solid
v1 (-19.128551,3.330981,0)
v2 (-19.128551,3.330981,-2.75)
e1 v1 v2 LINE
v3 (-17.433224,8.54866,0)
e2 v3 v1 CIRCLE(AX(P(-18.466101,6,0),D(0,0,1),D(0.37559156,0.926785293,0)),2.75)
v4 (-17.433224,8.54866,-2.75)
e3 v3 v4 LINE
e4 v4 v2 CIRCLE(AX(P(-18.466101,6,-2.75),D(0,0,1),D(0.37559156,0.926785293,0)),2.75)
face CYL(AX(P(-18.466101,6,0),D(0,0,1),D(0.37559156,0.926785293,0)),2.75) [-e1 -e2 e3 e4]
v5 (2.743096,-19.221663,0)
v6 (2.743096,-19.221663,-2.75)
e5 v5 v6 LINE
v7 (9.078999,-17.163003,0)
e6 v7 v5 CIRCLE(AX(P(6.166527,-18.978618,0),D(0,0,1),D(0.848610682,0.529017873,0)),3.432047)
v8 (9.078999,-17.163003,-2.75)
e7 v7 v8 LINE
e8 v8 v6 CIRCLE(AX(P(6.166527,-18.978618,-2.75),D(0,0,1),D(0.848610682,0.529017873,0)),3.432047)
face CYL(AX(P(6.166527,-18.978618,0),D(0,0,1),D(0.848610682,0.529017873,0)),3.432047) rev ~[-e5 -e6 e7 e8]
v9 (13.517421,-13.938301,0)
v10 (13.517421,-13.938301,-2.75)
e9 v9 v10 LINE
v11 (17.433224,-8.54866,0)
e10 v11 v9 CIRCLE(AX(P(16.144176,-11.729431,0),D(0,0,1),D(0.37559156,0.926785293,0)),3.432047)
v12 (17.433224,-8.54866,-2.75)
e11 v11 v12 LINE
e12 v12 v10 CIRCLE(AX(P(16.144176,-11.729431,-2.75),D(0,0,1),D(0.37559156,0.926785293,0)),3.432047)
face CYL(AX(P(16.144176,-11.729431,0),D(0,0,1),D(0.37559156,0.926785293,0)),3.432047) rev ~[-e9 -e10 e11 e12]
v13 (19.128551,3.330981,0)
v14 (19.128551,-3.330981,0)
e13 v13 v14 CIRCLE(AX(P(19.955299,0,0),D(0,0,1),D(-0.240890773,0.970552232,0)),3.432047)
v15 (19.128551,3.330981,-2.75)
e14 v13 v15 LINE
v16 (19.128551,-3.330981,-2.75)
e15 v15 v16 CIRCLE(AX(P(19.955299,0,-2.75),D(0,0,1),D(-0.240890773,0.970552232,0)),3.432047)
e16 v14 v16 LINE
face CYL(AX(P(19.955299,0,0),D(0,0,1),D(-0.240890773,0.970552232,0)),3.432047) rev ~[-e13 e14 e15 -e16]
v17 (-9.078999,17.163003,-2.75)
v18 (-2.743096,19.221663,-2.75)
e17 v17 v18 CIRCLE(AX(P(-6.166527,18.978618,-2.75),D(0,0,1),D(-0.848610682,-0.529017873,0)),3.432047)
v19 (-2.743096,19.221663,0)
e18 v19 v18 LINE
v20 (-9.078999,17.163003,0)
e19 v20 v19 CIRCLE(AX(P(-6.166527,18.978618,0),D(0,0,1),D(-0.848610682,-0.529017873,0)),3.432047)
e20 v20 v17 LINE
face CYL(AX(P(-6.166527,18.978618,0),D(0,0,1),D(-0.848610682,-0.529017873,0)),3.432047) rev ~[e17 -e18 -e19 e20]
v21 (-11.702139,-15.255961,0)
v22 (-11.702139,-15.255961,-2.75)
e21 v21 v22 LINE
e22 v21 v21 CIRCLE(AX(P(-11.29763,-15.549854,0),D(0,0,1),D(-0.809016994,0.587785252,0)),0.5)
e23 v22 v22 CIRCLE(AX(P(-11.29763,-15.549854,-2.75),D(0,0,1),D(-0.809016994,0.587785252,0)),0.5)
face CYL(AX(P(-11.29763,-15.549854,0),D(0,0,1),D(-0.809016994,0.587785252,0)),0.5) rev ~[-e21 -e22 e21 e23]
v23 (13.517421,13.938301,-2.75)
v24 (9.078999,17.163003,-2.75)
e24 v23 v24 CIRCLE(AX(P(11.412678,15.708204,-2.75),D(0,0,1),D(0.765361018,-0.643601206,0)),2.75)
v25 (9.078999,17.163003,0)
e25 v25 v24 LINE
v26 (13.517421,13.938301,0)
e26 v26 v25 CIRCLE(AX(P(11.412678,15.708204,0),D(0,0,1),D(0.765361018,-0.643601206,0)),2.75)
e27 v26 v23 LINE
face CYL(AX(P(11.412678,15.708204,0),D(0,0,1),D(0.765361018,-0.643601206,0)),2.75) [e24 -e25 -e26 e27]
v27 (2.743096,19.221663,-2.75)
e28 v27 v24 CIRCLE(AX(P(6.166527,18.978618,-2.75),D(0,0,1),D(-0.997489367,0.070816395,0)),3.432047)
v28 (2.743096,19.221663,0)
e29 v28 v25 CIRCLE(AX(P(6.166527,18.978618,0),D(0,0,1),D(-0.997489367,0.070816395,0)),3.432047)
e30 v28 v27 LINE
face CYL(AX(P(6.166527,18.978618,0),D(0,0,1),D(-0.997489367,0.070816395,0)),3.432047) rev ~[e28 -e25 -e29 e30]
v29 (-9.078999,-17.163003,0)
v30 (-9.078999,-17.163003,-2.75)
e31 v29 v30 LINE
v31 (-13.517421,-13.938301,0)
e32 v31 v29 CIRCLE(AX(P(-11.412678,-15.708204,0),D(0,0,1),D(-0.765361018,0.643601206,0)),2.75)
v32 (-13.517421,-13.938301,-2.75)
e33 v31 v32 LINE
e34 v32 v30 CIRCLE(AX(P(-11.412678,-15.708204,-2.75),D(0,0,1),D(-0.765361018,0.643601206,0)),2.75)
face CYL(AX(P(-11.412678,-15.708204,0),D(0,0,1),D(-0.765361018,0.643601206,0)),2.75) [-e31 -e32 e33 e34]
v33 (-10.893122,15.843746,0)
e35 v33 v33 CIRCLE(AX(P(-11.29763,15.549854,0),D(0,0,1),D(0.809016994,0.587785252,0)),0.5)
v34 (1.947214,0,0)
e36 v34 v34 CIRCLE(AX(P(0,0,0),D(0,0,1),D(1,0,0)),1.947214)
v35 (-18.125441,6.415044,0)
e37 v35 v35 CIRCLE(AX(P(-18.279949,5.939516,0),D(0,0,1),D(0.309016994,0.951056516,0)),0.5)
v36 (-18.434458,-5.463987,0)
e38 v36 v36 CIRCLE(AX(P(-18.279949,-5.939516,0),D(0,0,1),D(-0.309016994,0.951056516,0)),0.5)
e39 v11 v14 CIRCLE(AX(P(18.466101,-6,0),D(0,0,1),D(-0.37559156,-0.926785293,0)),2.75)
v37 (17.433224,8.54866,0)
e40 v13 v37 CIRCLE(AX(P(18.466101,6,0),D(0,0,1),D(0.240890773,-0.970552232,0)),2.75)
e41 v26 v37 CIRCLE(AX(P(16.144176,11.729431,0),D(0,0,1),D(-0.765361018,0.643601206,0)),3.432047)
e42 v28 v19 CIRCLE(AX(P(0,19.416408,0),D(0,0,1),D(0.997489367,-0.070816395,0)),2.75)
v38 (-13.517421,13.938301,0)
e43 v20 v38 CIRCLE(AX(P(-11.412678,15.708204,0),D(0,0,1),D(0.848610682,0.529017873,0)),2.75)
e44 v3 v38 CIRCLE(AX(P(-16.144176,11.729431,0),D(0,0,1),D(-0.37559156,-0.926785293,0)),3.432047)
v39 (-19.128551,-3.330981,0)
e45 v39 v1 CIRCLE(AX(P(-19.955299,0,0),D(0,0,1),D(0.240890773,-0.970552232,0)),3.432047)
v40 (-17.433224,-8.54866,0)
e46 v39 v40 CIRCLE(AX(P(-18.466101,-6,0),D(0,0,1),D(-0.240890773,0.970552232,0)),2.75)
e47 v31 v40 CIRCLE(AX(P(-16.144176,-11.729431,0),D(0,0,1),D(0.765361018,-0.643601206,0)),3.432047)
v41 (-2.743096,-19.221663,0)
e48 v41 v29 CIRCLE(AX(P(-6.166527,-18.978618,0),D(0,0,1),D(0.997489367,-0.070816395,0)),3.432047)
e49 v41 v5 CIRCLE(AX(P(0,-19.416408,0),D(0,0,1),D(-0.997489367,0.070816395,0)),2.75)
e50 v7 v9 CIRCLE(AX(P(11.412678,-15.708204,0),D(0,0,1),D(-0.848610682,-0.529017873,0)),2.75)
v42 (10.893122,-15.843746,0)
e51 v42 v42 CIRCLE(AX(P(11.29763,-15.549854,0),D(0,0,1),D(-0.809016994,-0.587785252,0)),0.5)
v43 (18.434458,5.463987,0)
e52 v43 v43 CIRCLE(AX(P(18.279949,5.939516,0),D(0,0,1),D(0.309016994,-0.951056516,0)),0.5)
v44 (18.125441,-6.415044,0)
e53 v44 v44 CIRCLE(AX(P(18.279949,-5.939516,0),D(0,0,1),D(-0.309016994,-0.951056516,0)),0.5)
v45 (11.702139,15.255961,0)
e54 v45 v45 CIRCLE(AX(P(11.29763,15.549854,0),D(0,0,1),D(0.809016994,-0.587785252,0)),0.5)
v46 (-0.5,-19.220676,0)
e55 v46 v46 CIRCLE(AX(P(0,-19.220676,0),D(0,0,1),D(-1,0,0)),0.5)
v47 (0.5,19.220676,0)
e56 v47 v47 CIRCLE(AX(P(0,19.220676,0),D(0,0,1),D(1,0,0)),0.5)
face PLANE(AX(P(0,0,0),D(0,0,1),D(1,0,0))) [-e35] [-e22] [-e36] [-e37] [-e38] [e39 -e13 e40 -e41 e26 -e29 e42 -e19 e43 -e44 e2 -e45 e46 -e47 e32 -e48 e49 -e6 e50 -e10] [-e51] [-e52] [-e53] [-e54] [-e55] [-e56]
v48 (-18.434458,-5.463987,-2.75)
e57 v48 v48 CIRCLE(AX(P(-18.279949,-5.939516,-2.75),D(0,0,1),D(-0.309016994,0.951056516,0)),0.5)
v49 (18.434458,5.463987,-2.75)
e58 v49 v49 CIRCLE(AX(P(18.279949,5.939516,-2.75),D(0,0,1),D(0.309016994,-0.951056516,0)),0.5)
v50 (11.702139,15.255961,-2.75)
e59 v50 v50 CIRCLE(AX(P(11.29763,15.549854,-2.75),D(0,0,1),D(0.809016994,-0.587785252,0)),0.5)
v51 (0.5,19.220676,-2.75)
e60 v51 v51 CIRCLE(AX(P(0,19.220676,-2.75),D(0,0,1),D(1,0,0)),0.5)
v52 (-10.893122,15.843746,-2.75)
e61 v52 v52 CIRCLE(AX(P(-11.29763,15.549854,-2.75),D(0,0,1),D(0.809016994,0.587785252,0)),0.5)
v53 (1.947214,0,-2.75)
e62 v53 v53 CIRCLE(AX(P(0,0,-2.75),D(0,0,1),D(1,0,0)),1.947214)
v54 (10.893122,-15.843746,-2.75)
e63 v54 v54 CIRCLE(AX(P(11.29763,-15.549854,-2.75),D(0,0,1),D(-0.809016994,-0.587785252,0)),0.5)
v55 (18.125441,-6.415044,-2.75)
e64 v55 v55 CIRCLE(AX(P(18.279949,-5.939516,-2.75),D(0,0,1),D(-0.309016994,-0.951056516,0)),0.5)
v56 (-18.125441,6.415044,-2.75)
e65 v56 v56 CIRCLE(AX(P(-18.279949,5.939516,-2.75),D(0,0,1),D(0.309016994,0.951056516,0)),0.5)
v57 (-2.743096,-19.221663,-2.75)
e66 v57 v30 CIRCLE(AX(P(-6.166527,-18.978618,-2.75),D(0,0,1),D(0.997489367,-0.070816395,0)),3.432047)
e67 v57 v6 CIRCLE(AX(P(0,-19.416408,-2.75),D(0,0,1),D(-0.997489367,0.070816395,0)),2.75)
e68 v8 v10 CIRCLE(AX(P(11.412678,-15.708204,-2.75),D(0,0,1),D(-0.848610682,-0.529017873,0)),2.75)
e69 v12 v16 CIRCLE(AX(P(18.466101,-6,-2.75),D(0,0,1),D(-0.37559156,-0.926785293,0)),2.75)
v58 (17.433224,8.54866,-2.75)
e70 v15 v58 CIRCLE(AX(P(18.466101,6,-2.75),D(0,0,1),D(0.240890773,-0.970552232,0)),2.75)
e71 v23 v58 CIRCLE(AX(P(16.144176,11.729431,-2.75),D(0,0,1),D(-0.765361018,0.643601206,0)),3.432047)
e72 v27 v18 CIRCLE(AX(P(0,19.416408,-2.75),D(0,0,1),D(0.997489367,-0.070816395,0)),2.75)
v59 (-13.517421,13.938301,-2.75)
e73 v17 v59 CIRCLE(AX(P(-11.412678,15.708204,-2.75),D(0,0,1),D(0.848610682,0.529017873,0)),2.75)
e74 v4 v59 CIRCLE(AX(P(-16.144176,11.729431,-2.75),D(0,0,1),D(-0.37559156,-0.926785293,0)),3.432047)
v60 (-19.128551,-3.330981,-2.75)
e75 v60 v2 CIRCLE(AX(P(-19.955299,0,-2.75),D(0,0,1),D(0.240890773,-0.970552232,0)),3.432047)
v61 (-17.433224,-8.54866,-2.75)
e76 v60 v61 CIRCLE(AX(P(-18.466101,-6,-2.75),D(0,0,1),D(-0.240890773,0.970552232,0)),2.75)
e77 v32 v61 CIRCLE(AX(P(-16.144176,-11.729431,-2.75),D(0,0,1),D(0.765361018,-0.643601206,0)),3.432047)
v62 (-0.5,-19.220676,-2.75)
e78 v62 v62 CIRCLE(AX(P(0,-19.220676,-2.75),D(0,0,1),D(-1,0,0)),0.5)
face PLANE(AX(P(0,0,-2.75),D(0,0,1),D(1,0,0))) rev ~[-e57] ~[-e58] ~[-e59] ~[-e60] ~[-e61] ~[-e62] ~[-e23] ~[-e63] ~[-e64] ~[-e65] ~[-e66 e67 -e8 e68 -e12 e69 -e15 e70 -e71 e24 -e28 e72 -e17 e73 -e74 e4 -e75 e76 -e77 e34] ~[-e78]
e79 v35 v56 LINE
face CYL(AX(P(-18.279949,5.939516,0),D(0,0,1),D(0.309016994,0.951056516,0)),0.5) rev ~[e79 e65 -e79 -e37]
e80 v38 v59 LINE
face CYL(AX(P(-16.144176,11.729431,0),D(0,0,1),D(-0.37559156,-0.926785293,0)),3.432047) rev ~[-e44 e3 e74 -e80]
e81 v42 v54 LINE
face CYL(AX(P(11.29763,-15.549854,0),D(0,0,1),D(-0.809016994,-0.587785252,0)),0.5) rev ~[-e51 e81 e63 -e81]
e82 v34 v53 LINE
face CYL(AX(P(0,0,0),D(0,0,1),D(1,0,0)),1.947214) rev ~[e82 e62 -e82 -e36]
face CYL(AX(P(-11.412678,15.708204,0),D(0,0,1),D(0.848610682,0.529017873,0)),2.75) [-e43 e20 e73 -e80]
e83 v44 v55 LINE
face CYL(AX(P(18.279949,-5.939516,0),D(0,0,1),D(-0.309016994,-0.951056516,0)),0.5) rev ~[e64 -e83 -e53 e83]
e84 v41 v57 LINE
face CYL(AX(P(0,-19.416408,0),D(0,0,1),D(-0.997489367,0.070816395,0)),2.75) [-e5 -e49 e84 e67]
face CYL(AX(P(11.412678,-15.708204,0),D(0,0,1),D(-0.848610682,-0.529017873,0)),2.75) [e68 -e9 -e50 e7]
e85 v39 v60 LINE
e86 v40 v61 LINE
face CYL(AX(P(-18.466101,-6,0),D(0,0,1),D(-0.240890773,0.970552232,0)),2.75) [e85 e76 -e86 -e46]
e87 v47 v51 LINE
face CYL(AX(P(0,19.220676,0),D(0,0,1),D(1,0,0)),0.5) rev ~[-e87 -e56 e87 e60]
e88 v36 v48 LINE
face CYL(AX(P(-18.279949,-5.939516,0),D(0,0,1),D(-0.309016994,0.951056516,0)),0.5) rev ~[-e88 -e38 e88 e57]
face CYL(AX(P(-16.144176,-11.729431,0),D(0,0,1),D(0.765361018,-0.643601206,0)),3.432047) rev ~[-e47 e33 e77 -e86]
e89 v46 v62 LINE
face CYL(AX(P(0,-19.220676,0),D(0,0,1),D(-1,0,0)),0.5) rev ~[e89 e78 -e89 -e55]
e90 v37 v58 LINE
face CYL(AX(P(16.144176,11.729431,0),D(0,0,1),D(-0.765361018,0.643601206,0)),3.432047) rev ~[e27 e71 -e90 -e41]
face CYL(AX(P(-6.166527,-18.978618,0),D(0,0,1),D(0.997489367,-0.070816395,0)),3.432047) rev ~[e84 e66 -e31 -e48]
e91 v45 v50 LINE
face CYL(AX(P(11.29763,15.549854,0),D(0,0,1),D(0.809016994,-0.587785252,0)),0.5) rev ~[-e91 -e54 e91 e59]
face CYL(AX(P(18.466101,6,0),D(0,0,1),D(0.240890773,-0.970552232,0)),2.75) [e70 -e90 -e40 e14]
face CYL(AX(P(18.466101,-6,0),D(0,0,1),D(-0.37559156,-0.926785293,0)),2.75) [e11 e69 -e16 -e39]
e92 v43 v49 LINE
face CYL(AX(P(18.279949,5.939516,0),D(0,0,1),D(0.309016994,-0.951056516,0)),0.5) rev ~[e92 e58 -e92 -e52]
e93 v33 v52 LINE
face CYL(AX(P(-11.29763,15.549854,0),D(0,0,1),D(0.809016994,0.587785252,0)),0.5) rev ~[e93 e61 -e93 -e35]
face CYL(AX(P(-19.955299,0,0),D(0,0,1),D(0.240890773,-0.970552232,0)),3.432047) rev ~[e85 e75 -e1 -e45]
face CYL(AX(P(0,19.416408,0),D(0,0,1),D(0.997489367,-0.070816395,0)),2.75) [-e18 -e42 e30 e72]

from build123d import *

# Parameters (mm, degrees)
F0_R            = 19.416407865
F1_DEPTH        = 2.75
F3_DEPTH        = 2.75
F3_COPIES_COUNT = 10
F5_DEPTH        = 25
F5_COPIES_COUNT = 10
F6_R            = 1.9472144129
F7_DEPTH        = 25
F8_R            = 0.5
F9_DEPTH        = 25
F9_COPIES_COUNT = 10


# Not quite as in the source:
# - a pattern or mirror of a feature is missing from the dataset's text; its kind, count and spacing are read off the source's solid


with BuildPart() as f1:
    # F0 (on Top) → F1 (new body)
    with BuildSketch(Plane.XY):
        Circle(F0_R)
    extrude(amount=-F1_DEPTH)

    # F2 (on face) → F3 (join)
    with BuildSketch(Plane.XY):
        with BuildLine():
            ThreePointArc((-2.7430957606, 19.22166278), (0, 19.416407865), (2.7430957606, 19.22166278))
            ThreePointArc((2.7430957606, 19.22166278), (0, 22.166407865), (-2.7430957606, 19.22166278))
        make_face()
    f3 = extrude(amount=-F3_DEPTH)

    # F3_copies: F3 ×10 about axis
    f3_copies_axis = Axis((0, 0, 0), (0, 0, 1))
    for i in range(1, F3_COPIES_COUNT):
        add(f3.rotate(f3_copies_axis, i * 360 / F3_COPIES_COUNT))

    # F4 (on face) → F5 (cut)
    with BuildSketch(Plane.XY):
        with BuildLine():
            Line((-6.2381998898, 19.1992051025), (-9.0789988191, 17.1630030829))
            ThreePointArc((-9.0789988191, 17.1630030829), (-5.1059656467, 15.7145464123), (-2.7430957606, 19.22166278))
            Line((-2.7430957606, 19.22166278), (-6.2381998898, 19.1992051025))
        make_face()
    f5 = extrude(amount=-F5_DEPTH, mode=Mode.SUBTRACT)

    # F5_copies: F5 ×10 about axis
    f5_copies_axis = Axis((0, 0, 0), (0, 0, 1))
    for i in range(1, F5_COPIES_COUNT):
        add(f5.rotate(f5_copies_axis, i * 360 / F5_COPIES_COUNT), mode=Mode.SUBTRACT)

    # F6 (on face) → F7 (cut)
    with BuildSketch(Plane.XY):
        Circle(F6_R)
    extrude(amount=-F7_DEPTH, mode=Mode.SUBTRACT)

    # F8 (on face) → F9 (cut)
    with BuildSketch(Plane.XY):
        with Locations((0, 19.2206762207)):
            Circle(F8_R)
    f9 = extrude(amount=-F9_DEPTH, mode=Mode.SUBTRACT)

    # F9_copies: F9 ×10 about axis
    f9_copies_axis = Axis((0, 0, 0), (0, 0, 1))
    for i in range(1, F9_COPIES_COUNT):
        add(f9.rotate(f9_copies_axis, i * 360 / F9_COPIES_COUNT), mode=Mode.SUBTRACT)


solid = f1.part
